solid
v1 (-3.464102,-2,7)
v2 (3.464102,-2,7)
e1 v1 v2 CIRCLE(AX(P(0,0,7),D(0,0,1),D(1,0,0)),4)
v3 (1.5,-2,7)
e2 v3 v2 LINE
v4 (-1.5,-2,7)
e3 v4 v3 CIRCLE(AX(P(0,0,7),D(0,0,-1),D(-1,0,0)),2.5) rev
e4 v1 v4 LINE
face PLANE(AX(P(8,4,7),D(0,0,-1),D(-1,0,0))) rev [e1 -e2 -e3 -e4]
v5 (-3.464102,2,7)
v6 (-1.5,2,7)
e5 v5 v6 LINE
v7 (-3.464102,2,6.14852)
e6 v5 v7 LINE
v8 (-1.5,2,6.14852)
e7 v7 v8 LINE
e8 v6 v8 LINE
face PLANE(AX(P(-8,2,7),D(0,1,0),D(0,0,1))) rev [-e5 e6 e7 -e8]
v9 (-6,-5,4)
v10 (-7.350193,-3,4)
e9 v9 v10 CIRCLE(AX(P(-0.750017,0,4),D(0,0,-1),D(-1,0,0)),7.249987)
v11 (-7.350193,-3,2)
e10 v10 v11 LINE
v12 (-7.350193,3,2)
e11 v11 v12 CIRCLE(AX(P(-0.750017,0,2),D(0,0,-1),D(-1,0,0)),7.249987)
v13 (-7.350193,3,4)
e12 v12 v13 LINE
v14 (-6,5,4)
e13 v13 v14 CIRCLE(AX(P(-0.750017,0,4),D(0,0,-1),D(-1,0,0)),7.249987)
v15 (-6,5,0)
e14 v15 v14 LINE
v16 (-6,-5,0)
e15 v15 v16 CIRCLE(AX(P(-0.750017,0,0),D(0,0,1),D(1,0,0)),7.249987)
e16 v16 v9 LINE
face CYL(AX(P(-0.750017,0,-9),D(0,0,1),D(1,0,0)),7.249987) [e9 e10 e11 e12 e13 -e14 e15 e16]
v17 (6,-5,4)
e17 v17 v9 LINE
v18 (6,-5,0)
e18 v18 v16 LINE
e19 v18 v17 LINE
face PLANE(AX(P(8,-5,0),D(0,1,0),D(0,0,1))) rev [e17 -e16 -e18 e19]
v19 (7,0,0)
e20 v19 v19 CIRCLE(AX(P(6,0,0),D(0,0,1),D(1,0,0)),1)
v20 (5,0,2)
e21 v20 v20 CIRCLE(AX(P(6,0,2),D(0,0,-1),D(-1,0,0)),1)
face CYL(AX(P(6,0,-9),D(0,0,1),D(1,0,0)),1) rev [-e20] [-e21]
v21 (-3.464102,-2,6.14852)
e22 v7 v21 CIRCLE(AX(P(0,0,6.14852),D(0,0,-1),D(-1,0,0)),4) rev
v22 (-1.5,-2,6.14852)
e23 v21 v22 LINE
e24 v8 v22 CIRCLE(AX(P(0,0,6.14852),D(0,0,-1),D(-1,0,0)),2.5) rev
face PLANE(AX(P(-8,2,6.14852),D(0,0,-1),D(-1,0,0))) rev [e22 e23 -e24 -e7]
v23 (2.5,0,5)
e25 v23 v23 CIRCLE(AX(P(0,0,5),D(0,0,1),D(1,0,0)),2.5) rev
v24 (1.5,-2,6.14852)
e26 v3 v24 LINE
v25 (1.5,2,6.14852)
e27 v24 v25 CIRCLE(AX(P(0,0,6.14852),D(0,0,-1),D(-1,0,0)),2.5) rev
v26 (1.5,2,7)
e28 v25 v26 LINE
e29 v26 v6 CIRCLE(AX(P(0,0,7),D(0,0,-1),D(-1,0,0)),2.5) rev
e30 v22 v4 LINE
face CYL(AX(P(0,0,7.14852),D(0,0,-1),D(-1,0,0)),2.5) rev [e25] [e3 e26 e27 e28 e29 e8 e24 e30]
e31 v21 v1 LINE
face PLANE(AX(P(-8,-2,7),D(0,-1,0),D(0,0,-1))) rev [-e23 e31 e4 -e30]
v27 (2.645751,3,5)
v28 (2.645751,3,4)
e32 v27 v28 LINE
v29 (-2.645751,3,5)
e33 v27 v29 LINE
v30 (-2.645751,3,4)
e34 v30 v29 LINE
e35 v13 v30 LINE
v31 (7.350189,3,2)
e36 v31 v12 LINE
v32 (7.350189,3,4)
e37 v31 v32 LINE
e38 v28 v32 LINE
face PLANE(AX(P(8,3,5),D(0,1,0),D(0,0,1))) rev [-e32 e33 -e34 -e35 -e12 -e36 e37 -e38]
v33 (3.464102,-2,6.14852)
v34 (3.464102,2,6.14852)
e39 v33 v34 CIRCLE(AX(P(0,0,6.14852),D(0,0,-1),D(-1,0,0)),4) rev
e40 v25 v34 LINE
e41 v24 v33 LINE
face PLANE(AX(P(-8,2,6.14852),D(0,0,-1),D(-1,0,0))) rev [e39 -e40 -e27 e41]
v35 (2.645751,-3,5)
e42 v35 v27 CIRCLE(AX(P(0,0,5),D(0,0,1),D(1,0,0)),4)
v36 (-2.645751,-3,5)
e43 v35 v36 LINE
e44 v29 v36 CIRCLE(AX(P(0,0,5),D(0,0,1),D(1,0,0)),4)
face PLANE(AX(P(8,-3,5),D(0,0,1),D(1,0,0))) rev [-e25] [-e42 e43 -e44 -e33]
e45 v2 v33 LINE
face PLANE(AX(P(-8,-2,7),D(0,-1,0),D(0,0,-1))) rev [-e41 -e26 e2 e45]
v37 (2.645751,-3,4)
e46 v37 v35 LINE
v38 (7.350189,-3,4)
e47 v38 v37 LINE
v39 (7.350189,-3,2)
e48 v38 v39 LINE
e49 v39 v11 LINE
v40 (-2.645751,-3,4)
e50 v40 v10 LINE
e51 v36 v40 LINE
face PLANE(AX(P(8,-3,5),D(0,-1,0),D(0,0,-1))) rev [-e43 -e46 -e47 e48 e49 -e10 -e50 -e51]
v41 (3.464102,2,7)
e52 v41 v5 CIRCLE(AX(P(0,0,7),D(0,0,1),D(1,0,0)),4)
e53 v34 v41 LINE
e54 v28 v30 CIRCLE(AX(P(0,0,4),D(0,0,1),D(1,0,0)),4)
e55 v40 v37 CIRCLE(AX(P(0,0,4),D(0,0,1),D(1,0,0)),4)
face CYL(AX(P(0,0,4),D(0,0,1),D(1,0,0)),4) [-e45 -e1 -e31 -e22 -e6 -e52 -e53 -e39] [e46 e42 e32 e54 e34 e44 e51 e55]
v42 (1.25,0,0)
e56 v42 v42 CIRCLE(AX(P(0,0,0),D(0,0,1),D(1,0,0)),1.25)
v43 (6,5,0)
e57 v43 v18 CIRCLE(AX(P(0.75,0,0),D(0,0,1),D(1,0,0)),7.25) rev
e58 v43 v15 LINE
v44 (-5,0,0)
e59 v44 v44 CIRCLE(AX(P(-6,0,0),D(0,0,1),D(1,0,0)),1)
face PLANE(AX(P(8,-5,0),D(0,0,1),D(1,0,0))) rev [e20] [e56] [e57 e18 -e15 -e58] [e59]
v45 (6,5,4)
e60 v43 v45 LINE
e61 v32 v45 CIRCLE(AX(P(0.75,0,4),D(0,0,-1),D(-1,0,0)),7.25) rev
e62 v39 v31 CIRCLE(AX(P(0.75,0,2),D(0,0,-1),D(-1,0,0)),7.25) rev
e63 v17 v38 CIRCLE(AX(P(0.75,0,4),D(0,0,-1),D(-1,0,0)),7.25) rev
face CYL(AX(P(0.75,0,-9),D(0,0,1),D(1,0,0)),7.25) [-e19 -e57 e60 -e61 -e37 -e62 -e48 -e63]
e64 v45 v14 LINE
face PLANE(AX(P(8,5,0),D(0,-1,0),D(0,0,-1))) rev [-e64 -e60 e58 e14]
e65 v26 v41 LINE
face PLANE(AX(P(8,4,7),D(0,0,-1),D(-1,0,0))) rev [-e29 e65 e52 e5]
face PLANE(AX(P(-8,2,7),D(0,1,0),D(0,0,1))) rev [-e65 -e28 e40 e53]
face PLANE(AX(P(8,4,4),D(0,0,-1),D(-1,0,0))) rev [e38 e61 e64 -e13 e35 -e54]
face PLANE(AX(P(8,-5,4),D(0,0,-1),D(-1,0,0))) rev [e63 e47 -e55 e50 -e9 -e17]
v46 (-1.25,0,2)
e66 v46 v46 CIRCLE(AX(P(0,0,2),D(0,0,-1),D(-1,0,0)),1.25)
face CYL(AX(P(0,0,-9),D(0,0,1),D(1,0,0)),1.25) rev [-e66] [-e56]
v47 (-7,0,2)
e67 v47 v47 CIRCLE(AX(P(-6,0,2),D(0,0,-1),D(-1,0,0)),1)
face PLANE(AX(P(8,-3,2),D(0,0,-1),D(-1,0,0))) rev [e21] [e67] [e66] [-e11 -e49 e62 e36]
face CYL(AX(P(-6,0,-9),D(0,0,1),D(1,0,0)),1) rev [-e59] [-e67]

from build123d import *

# Parameters (mm, degrees)
BOSS_EXTRUDE1_DEPTH      = 8
SKETCH2_W                = 3
SKETCH2_H                = 6
CUT_EXTRUDE1_DEPTH       = 16
CUT_EXTRUDE2_START       = -7
CUT_EXTRUDE2_OUTLINE_R   = 1
CUT_EXTRUDE2_OUTLINE_R_2 = 1.25
CUT_EXTRUDE2_DEPTH       = 7
SKETCH4_R                = 11.300905521
SKETCH4_R_2              = 4
CUT_EXTRUDE3_DEPTH       = 3
SKETCH5_W                = 0.851480407
SKETCH5_H                = 4
CUT_EXTRUDE4_DEPTH       = 8
CUT_EXTRUDE5_DEPTH       = 1
CUT_EXTRUDE5_DEPTH_BACK  = 2
SKETCH6_R                = 2.5


# Read off the part's stored shape, not the designer's step: Cut-Extrude2
with BuildPart() as part:
    # Sketch1 → Boss-Extrude1 (new, symmetric)
    with BuildSketch(Plane(origin=(0, 0, 0), x_dir=(0, 0, -1), z_dir=(1, 0, 0))):
        Polygon((0, -5), (0, 5), (-4, 5), (-4, 4), (-7, 4), (-7, -4), (-4, -4), (-4, -5), align=None)
    extrude(amount=BOSS_EXTRUDE1_DEPTH, both=True)

    # Sketch2 → Cut-Extrude1 (cut)
    with BuildSketch(Plane.ZY.offset(8)):
        with Locations((3.5, 0)):
            Rectangle(SKETCH2_W, SKETCH2_H)
    extrude(amount=-CUT_EXTRUDE1_DEPTH, mode=Mode.SUBTRACT)

    # Cut-Extrude2 outline → Cut-Extrude2 (cut)
    with BuildSketch(Plane.XY.offset(7).offset(CUT_EXTRUDE2_START)):
        with BuildLine():
            ThreePointArc((-8.000004764, 0), (-7.481459456, 2.692583288), (-6, 5))
            Line((-6, 5), (-8, 5))
            Line((-8, 5), (-8.000004764, 0))
        make_face()
        with BuildLine():
            ThreePointArc((-6, -5), (-7.481459456, -2.692583288), (-8.000004764, 0))
            Line((-8.000004764, 0), (-8, -5))
            Line((-8, -5), (-6, -5))
        make_face()
        with BuildLine():
            Line((8, 5), (6, 5))
            ThreePointArc((6, 5), (7.481456009, 2.692582404), (8, 0))
            Line((8, 0), (8, 5))
        make_face()
        with BuildLine():
            Line((8, -5), (8, 0))
            ThreePointArc((8, 0), (7.481456009, -2.692582404), (6, -5))
            Line((6, -5), (8, -5))
        make_face()
        with Locations((-6, 0)):
            Circle(CUT_EXTRUDE2_OUTLINE_R)
        Circle(CUT_EXTRUDE2_OUTLINE_R_2)
        with Locations((6, 0)):
            Circle(CUT_EXTRUDE2_OUTLINE_R)
    extrude(amount=CUT_EXTRUDE2_DEPTH, mode=Mode.SUBTRACT)

    # Sketch4 → Cut-Extrude3 (cut)
    with BuildSketch(Plane.XY.offset(7)):
        Circle(SKETCH4_R)
        Circle(SKETCH4_R_2, mode=Mode.SUBTRACT)
    extrude(amount=-CUT_EXTRUDE3_DEPTH, mode=Mode.SUBTRACT)

    # Sketch5 → Cut-Extrude4 (cut, symmetric)
    with BuildSketch(Plane(origin=(0, 0, 0), x_dir=(0, 0, -1), z_dir=(1, 0, 0))):
        with Locations((-6.574259796, 0)):
            Rectangle(SKETCH5_W, SKETCH5_H)
    extrude(amount=CUT_EXTRUDE4_DEPTH, both=True, mode=Mode.SUBTRACT)

    # Sketch6 → Cut-Extrude5 (cut, two sides: drawn at the far end of the back side and taken through both)
    with BuildSketch(Plane.XY.offset(6.148519593).offset(-CUT_EXTRUDE5_DEPTH_BACK)):
        with Locations(Location((0, 0, 0), (0, 0, 233.130102354))):
            Circle(SKETCH6_R)
    extrude(amount=CUT_EXTRUDE5_DEPTH + CUT_EXTRUDE5_DEPTH_BACK, mode=Mode.SUBTRACT)


solid = part.part
